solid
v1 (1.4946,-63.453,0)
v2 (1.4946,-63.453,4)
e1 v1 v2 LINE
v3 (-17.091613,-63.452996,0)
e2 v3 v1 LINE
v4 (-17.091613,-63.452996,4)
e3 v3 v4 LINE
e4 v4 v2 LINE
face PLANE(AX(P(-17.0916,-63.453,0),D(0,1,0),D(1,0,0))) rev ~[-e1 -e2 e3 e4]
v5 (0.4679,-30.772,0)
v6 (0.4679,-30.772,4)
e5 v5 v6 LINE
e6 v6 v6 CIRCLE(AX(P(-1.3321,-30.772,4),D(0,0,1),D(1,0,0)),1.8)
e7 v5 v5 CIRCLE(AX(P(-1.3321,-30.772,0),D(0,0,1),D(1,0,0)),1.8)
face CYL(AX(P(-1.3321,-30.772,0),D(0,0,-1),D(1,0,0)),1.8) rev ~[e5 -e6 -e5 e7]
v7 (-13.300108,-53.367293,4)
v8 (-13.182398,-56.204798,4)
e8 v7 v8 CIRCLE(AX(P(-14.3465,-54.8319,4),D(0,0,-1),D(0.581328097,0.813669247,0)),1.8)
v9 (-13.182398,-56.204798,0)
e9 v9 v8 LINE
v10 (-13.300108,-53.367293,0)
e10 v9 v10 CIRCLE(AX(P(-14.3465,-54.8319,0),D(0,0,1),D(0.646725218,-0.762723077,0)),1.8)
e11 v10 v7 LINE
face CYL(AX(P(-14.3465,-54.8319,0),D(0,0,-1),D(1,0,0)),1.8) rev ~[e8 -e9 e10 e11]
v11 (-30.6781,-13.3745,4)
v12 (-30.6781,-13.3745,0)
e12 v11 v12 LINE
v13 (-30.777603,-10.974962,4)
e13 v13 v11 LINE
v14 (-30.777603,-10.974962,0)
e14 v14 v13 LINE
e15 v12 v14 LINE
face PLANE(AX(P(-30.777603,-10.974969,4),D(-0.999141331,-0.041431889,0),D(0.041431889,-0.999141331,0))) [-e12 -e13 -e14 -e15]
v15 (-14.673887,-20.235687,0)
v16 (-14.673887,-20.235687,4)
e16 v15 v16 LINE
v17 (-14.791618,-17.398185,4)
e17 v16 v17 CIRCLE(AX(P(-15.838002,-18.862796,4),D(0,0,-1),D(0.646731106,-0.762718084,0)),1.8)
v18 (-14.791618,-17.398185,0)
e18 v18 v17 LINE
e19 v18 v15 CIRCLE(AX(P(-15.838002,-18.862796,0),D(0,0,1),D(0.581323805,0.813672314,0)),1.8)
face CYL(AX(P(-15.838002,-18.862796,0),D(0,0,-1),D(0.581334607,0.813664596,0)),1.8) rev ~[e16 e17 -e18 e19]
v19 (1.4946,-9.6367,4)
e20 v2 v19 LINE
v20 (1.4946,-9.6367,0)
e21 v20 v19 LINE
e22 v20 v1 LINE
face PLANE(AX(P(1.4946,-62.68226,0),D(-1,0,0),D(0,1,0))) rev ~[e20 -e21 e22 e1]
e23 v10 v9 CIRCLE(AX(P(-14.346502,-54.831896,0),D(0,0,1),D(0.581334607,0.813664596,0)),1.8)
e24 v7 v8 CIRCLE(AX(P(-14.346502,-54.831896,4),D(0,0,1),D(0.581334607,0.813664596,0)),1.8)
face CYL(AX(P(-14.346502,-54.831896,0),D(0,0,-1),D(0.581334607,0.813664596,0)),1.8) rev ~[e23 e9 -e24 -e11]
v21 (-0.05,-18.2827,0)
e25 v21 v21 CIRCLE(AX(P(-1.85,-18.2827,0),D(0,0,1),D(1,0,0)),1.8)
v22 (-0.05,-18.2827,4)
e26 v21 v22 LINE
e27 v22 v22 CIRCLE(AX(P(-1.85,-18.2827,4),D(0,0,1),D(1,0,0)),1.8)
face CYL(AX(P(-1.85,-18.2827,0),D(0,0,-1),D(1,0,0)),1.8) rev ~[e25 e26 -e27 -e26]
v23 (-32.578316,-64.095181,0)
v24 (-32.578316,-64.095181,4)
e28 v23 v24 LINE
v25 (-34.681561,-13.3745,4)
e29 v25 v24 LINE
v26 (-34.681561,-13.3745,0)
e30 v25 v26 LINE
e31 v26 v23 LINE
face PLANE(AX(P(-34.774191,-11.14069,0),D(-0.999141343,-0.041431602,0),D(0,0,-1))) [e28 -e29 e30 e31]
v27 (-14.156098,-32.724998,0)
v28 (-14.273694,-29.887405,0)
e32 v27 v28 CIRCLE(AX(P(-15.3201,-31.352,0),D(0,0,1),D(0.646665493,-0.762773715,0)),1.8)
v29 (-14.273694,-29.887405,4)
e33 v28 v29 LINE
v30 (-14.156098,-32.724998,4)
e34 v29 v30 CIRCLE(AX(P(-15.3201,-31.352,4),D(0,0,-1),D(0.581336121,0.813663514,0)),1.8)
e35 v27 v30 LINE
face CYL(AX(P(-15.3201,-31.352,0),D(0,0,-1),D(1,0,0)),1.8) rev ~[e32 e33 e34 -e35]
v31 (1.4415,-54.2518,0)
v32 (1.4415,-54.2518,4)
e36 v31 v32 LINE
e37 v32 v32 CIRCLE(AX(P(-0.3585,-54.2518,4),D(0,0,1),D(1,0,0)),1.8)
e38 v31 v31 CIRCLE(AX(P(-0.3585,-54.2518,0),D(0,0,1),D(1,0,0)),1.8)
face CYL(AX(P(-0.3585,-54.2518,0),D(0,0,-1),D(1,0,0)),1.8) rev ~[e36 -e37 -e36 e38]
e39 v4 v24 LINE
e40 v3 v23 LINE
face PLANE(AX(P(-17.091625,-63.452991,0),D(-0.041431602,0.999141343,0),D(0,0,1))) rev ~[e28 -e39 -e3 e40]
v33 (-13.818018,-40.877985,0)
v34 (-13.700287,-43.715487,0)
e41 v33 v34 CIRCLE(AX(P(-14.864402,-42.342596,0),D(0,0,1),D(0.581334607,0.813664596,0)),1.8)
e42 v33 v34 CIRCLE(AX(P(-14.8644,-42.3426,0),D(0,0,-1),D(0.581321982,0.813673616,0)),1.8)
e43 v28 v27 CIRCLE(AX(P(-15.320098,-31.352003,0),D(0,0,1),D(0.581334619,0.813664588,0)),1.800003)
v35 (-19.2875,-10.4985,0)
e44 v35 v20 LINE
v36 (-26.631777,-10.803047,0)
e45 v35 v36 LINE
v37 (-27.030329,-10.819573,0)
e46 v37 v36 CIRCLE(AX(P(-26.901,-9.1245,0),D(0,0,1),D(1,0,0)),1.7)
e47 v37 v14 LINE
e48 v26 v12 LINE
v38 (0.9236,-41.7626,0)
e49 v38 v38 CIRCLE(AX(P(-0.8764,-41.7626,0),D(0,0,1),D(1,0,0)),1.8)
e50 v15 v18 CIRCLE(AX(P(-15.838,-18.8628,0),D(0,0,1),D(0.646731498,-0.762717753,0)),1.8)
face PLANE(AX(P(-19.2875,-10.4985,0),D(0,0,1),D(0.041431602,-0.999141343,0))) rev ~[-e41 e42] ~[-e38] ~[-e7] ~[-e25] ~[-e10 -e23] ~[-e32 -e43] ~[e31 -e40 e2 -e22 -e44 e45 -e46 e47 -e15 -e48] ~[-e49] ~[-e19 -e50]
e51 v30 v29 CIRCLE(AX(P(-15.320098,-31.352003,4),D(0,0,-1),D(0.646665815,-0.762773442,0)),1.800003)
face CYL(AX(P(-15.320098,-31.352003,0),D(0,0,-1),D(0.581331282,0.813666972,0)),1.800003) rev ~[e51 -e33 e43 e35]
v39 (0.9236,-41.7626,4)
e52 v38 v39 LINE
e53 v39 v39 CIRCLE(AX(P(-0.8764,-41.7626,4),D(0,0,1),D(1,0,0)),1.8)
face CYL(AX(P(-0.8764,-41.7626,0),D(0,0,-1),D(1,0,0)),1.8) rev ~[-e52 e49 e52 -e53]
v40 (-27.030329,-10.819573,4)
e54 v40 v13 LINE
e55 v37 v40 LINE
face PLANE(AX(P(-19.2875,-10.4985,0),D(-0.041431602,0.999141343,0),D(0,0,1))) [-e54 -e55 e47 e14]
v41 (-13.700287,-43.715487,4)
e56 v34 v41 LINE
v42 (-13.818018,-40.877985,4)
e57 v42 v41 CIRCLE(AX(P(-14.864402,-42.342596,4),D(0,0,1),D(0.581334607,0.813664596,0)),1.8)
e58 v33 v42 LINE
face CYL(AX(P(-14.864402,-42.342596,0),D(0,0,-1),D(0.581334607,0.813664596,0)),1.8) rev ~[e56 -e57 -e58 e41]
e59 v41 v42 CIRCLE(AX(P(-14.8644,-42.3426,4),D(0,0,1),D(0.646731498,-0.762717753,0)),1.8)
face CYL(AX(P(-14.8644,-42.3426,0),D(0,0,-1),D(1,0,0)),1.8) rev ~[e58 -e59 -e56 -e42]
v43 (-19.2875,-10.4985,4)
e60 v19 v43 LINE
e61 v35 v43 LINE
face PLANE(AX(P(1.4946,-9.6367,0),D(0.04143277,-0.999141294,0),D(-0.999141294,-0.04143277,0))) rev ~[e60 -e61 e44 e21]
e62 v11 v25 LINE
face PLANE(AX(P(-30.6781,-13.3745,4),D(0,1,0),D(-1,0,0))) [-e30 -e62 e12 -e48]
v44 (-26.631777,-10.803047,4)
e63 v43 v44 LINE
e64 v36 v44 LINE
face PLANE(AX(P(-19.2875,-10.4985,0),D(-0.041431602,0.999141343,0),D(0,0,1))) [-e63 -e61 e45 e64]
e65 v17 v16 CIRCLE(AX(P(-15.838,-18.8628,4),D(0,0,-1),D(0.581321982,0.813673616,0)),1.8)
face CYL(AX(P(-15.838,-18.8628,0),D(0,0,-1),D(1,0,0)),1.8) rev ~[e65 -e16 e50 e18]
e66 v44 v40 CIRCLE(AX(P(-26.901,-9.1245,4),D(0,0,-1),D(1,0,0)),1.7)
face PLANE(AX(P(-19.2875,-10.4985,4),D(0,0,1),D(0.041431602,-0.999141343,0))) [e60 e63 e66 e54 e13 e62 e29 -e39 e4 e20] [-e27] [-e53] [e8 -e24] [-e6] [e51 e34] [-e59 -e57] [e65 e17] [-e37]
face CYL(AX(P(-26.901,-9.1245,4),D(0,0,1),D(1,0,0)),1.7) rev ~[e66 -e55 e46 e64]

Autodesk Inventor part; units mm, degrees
ref_plane "YZ Plane" through (0, 0, 0) normal (1, 0, 0) x (0, 1, 0)
ref_plane "XZ Plane" through (0, 0, 0) normal (0, 1, 0) x (-1, 0, 0)
ref_plane "XY Plane" through (0, 0, 0) normal (0, 0, 1) x (1, 0, 0)
sketch "Skizze1" plane through (0, 0, 0) normal (0, 0, 1) x (1, 0, 0)
  ellipse E0 centre (-12.1961, -42.2319) end of major axis (-9.6527, -42.1265) minor radius 1.8 (-13.7003, -43.7155) -> (-13.818, -40.878) ccw projected
  arc A0 (-13.818, -40.878) -> (-13.7003, -43.7155) centre (-14.8644, -42.3426) ccw projected
  ellipse E1 centre (-12.6519, -31.2414) end of major axis (-10.1085, -31.1359) minor radius 1.8 (-14.1561, -32.725) -> (-14.2737, -29.8874) ccw projected
  arc A1 (-14.2737, -29.8874) -> (-14.1561, -32.725) centre (-15.3201, -31.352) ccw projected
  ellipse E2 centre (-13.1697, -18.7521) end of major axis (-10.6263, -18.6467) minor radius 1.8 (-14.6739, -20.2357) -> (-14.7916, -17.3982) ccw projected
  arc A2 (-14.7916, -17.3982) -> (-14.6739, -20.2357) centre (-15.838, -18.8628) ccw projected
  ellipse E3 centre (-11.6782, -54.7212) end of major axis (-9.1348, -54.6157) minor radius 1.8 (-13.1824, -56.2048) -> (-13.3001, -53.3673) ccw projected
  arc A3 (-13.3001, -53.3673) -> (-13.1824, -56.2048) centre (-14.3465, -54.8319) ccw projected
  line L0 (1.4946, -9.6367) -> (3.6905, -62.5912) projected
  line L1 (1.4946, -9.6367) -> (-19.2875, -10.4985) projected
  line L2 (-19.2875, -10.4985) -> (-17.0916, -63.453) projected
  line L3 (-17.0916, -63.453) -> (3.6905, -62.5912) projected
  circle A4 centre (-0.8764, -41.7626) radius 1.8 projected
  circle A5 centre (-1.3321, -30.772) radius 1.8 projected
  circle A6 centre (-1.85, -18.2827) radius 1.8 projected
  circle A7 centre (-0.3585, -54.2518) radius 1.8 projected
  line L4 (1.4946, -9.6367) -> (-17.0916, -9.6367)
  line L5 (-17.0916, -9.6367) -> (-17.0916, -63.453)
  line L6 (-17.0916, -63.453) -> (1.4946, -63.453)
  line L7 (1.4946, -63.453) -> (1.4946, -9.6367)
  circle A8 centre (-0.3585, -54.2518) radius 1.8
  circle A9 centre (-0.8764, -41.7626) radius 1.8
  circle A10 centre (-1.3321, -30.772) radius 1.8
  circle A11 centre (-1.85, -18.2827) radius 1.8
  circle A12 centre (-15.838, -18.8628) radius 1.8
  circle A13 centre (-15.3201, -31.352) radius 1.8
  circle A14 centre (-14.8644, -42.3426) radius 1.8
  circle A15 centre (-14.3465, -54.8319) radius 1.8
  point P0 (0, 0)
extrude "Extrusion1" add sketch "Skizze1" along normal blind 4 contours A14 E0 | A13 E1 | E1 A1 L5 A2 E2 L1 L7 L3 | L5 L2 L1 A2 A1 | L3 L7 L6 | A12 E2 | A15 E3
sketch "Skizze2" plane through (1.4946, -9.6367, 0) normal (1, 0, 0) x (0, 0, 1)
  line L0 (0, 0.8618) -> (0, 53.8163) projected
  line L1 (0, 0.8618) -> (19, 0.8618)
  line L2 (19, 0.8618) -> (19, 53.8163)
  line L3 (19, 53.8163) -> (0, 53.8163)
  line L4 (0, 53.8163) -> (0, 0.8618)
  line L5 (4, 53.8163) -> (4, 0) projected
  point P0 (0, -9.6367)
  dimension "d3" = 15
extrude "Extrusion2" [suppressed]
sketch "Skizze3" plane through (-6.3, -26.5, 0) normal (1, 0, 0) x (0, 0, -1)
  line L0 (-7, 52) -> (-15, 52)
  line L1 (-15, 52) -> (-15, 35)
  line L2 (-15, 35) -> (-7, 35)
  line L3 (-7, 35) -> (-7, 52)
  line L4 (-4, 53) -> (-4, 0) projected
  line L5 (-19, 53) -> (-4, 53) projected
  circle A0 centre (-11, 31) radius 1.5
  point P0 (0, 26.5)
  dimension "d6" = 8
  dimension "d7" = 17
  dimension "d8" = 3
  dimension "d9" = 1
  dimension "d10" = 4
  dimension "d11" = 3
  dimension "d12" = 4
extrude "Extrusion3" [suppressed]
ref_plane "Arbeitsebene1" through (-1296.3098, -63.453, 4) normal (0.0207202, -0.9997853, 0) x (0, 0, 1)
mirror "Spiegeln1" [suppressed]
sketch "Skizze4" plane through (-19.2875, -10.4985, 0) normal (-0.9991413, -0.0414316, 0) x (0, 0, -1)
  line L0 (0, 0) -> (0, 53) projected
  line L1 (0, 53) -> (-4, 53) projected
  line L2 (-4, 0) -> (-4, 53) projected
  line L3 (0, 0) -> (-4, 0) projected
  point P0 (0, -9.6904)
extrude "Extrusion4" add sketch "Skizze4" along normal blind 15.5
sketch "Skizze5" plane through (0, 0, 4) normal (0, 0, 1) x (1, 0, 0)
  line L0 (-30.6781, -13.3745) -> (-38.5781, -13.3745)
  line L1 (-38.5781, -13.3745) -> (-39.6071, 11.4403)
  line L2 (-39.6071, 11.4403) -> (-31.7139, 11.6041)
  line L3 (-31.7139, 11.6041) -> (-30.6781, -13.3745)
  line L4 (-32.5783, -64.0952) -> (-34.7742, -11.1407) projected
  line L5 (-17.0916, -63.453) -> (-32.5783, -63.453) projected
  line L6 (1.4946, -9.6367) -> (-34.7742, -11.1407) projected
  circle A0 centre (-26.901, -9.1245) radius 1.7
  circle A1 centre (-28.2889, 24.3468) radius 1.7
  point P0 (0, 0)
  point P1 (-6.3, 26.5)
  point P2 (-6.3, -26.5)
  point P3 (1.4946, -9.6367)
  dimension "d26" = 7.9
  dimension "d27" = 25
  dimension "d28" = 14
  dimension "d29" = 53
  dimension "d30" = 3.95
  dimension "d31" = 3.95
  dimension "d32" = 33.5
  dimension "d33" = 3.4
  dimension "d34" = 3.4
  dimension "d35" = 4.25
  dimension "d41" = 4
extrude "Extrusion5" cut sketch "Skizze5" against normal blind 4
equation "\"d12\" = 0.5 * d6"
equation "\"d28\" = -0.5 * d27 + 0.5 * d29"
equation "\"d30\" = 0.5 * d26"
equation "\"d31\" = d30"
equation "\"d34\" = d33"
equation "\"d35\" = 0.5 * d32 - 0.5 * d27"
properties part number "cable_mount"
